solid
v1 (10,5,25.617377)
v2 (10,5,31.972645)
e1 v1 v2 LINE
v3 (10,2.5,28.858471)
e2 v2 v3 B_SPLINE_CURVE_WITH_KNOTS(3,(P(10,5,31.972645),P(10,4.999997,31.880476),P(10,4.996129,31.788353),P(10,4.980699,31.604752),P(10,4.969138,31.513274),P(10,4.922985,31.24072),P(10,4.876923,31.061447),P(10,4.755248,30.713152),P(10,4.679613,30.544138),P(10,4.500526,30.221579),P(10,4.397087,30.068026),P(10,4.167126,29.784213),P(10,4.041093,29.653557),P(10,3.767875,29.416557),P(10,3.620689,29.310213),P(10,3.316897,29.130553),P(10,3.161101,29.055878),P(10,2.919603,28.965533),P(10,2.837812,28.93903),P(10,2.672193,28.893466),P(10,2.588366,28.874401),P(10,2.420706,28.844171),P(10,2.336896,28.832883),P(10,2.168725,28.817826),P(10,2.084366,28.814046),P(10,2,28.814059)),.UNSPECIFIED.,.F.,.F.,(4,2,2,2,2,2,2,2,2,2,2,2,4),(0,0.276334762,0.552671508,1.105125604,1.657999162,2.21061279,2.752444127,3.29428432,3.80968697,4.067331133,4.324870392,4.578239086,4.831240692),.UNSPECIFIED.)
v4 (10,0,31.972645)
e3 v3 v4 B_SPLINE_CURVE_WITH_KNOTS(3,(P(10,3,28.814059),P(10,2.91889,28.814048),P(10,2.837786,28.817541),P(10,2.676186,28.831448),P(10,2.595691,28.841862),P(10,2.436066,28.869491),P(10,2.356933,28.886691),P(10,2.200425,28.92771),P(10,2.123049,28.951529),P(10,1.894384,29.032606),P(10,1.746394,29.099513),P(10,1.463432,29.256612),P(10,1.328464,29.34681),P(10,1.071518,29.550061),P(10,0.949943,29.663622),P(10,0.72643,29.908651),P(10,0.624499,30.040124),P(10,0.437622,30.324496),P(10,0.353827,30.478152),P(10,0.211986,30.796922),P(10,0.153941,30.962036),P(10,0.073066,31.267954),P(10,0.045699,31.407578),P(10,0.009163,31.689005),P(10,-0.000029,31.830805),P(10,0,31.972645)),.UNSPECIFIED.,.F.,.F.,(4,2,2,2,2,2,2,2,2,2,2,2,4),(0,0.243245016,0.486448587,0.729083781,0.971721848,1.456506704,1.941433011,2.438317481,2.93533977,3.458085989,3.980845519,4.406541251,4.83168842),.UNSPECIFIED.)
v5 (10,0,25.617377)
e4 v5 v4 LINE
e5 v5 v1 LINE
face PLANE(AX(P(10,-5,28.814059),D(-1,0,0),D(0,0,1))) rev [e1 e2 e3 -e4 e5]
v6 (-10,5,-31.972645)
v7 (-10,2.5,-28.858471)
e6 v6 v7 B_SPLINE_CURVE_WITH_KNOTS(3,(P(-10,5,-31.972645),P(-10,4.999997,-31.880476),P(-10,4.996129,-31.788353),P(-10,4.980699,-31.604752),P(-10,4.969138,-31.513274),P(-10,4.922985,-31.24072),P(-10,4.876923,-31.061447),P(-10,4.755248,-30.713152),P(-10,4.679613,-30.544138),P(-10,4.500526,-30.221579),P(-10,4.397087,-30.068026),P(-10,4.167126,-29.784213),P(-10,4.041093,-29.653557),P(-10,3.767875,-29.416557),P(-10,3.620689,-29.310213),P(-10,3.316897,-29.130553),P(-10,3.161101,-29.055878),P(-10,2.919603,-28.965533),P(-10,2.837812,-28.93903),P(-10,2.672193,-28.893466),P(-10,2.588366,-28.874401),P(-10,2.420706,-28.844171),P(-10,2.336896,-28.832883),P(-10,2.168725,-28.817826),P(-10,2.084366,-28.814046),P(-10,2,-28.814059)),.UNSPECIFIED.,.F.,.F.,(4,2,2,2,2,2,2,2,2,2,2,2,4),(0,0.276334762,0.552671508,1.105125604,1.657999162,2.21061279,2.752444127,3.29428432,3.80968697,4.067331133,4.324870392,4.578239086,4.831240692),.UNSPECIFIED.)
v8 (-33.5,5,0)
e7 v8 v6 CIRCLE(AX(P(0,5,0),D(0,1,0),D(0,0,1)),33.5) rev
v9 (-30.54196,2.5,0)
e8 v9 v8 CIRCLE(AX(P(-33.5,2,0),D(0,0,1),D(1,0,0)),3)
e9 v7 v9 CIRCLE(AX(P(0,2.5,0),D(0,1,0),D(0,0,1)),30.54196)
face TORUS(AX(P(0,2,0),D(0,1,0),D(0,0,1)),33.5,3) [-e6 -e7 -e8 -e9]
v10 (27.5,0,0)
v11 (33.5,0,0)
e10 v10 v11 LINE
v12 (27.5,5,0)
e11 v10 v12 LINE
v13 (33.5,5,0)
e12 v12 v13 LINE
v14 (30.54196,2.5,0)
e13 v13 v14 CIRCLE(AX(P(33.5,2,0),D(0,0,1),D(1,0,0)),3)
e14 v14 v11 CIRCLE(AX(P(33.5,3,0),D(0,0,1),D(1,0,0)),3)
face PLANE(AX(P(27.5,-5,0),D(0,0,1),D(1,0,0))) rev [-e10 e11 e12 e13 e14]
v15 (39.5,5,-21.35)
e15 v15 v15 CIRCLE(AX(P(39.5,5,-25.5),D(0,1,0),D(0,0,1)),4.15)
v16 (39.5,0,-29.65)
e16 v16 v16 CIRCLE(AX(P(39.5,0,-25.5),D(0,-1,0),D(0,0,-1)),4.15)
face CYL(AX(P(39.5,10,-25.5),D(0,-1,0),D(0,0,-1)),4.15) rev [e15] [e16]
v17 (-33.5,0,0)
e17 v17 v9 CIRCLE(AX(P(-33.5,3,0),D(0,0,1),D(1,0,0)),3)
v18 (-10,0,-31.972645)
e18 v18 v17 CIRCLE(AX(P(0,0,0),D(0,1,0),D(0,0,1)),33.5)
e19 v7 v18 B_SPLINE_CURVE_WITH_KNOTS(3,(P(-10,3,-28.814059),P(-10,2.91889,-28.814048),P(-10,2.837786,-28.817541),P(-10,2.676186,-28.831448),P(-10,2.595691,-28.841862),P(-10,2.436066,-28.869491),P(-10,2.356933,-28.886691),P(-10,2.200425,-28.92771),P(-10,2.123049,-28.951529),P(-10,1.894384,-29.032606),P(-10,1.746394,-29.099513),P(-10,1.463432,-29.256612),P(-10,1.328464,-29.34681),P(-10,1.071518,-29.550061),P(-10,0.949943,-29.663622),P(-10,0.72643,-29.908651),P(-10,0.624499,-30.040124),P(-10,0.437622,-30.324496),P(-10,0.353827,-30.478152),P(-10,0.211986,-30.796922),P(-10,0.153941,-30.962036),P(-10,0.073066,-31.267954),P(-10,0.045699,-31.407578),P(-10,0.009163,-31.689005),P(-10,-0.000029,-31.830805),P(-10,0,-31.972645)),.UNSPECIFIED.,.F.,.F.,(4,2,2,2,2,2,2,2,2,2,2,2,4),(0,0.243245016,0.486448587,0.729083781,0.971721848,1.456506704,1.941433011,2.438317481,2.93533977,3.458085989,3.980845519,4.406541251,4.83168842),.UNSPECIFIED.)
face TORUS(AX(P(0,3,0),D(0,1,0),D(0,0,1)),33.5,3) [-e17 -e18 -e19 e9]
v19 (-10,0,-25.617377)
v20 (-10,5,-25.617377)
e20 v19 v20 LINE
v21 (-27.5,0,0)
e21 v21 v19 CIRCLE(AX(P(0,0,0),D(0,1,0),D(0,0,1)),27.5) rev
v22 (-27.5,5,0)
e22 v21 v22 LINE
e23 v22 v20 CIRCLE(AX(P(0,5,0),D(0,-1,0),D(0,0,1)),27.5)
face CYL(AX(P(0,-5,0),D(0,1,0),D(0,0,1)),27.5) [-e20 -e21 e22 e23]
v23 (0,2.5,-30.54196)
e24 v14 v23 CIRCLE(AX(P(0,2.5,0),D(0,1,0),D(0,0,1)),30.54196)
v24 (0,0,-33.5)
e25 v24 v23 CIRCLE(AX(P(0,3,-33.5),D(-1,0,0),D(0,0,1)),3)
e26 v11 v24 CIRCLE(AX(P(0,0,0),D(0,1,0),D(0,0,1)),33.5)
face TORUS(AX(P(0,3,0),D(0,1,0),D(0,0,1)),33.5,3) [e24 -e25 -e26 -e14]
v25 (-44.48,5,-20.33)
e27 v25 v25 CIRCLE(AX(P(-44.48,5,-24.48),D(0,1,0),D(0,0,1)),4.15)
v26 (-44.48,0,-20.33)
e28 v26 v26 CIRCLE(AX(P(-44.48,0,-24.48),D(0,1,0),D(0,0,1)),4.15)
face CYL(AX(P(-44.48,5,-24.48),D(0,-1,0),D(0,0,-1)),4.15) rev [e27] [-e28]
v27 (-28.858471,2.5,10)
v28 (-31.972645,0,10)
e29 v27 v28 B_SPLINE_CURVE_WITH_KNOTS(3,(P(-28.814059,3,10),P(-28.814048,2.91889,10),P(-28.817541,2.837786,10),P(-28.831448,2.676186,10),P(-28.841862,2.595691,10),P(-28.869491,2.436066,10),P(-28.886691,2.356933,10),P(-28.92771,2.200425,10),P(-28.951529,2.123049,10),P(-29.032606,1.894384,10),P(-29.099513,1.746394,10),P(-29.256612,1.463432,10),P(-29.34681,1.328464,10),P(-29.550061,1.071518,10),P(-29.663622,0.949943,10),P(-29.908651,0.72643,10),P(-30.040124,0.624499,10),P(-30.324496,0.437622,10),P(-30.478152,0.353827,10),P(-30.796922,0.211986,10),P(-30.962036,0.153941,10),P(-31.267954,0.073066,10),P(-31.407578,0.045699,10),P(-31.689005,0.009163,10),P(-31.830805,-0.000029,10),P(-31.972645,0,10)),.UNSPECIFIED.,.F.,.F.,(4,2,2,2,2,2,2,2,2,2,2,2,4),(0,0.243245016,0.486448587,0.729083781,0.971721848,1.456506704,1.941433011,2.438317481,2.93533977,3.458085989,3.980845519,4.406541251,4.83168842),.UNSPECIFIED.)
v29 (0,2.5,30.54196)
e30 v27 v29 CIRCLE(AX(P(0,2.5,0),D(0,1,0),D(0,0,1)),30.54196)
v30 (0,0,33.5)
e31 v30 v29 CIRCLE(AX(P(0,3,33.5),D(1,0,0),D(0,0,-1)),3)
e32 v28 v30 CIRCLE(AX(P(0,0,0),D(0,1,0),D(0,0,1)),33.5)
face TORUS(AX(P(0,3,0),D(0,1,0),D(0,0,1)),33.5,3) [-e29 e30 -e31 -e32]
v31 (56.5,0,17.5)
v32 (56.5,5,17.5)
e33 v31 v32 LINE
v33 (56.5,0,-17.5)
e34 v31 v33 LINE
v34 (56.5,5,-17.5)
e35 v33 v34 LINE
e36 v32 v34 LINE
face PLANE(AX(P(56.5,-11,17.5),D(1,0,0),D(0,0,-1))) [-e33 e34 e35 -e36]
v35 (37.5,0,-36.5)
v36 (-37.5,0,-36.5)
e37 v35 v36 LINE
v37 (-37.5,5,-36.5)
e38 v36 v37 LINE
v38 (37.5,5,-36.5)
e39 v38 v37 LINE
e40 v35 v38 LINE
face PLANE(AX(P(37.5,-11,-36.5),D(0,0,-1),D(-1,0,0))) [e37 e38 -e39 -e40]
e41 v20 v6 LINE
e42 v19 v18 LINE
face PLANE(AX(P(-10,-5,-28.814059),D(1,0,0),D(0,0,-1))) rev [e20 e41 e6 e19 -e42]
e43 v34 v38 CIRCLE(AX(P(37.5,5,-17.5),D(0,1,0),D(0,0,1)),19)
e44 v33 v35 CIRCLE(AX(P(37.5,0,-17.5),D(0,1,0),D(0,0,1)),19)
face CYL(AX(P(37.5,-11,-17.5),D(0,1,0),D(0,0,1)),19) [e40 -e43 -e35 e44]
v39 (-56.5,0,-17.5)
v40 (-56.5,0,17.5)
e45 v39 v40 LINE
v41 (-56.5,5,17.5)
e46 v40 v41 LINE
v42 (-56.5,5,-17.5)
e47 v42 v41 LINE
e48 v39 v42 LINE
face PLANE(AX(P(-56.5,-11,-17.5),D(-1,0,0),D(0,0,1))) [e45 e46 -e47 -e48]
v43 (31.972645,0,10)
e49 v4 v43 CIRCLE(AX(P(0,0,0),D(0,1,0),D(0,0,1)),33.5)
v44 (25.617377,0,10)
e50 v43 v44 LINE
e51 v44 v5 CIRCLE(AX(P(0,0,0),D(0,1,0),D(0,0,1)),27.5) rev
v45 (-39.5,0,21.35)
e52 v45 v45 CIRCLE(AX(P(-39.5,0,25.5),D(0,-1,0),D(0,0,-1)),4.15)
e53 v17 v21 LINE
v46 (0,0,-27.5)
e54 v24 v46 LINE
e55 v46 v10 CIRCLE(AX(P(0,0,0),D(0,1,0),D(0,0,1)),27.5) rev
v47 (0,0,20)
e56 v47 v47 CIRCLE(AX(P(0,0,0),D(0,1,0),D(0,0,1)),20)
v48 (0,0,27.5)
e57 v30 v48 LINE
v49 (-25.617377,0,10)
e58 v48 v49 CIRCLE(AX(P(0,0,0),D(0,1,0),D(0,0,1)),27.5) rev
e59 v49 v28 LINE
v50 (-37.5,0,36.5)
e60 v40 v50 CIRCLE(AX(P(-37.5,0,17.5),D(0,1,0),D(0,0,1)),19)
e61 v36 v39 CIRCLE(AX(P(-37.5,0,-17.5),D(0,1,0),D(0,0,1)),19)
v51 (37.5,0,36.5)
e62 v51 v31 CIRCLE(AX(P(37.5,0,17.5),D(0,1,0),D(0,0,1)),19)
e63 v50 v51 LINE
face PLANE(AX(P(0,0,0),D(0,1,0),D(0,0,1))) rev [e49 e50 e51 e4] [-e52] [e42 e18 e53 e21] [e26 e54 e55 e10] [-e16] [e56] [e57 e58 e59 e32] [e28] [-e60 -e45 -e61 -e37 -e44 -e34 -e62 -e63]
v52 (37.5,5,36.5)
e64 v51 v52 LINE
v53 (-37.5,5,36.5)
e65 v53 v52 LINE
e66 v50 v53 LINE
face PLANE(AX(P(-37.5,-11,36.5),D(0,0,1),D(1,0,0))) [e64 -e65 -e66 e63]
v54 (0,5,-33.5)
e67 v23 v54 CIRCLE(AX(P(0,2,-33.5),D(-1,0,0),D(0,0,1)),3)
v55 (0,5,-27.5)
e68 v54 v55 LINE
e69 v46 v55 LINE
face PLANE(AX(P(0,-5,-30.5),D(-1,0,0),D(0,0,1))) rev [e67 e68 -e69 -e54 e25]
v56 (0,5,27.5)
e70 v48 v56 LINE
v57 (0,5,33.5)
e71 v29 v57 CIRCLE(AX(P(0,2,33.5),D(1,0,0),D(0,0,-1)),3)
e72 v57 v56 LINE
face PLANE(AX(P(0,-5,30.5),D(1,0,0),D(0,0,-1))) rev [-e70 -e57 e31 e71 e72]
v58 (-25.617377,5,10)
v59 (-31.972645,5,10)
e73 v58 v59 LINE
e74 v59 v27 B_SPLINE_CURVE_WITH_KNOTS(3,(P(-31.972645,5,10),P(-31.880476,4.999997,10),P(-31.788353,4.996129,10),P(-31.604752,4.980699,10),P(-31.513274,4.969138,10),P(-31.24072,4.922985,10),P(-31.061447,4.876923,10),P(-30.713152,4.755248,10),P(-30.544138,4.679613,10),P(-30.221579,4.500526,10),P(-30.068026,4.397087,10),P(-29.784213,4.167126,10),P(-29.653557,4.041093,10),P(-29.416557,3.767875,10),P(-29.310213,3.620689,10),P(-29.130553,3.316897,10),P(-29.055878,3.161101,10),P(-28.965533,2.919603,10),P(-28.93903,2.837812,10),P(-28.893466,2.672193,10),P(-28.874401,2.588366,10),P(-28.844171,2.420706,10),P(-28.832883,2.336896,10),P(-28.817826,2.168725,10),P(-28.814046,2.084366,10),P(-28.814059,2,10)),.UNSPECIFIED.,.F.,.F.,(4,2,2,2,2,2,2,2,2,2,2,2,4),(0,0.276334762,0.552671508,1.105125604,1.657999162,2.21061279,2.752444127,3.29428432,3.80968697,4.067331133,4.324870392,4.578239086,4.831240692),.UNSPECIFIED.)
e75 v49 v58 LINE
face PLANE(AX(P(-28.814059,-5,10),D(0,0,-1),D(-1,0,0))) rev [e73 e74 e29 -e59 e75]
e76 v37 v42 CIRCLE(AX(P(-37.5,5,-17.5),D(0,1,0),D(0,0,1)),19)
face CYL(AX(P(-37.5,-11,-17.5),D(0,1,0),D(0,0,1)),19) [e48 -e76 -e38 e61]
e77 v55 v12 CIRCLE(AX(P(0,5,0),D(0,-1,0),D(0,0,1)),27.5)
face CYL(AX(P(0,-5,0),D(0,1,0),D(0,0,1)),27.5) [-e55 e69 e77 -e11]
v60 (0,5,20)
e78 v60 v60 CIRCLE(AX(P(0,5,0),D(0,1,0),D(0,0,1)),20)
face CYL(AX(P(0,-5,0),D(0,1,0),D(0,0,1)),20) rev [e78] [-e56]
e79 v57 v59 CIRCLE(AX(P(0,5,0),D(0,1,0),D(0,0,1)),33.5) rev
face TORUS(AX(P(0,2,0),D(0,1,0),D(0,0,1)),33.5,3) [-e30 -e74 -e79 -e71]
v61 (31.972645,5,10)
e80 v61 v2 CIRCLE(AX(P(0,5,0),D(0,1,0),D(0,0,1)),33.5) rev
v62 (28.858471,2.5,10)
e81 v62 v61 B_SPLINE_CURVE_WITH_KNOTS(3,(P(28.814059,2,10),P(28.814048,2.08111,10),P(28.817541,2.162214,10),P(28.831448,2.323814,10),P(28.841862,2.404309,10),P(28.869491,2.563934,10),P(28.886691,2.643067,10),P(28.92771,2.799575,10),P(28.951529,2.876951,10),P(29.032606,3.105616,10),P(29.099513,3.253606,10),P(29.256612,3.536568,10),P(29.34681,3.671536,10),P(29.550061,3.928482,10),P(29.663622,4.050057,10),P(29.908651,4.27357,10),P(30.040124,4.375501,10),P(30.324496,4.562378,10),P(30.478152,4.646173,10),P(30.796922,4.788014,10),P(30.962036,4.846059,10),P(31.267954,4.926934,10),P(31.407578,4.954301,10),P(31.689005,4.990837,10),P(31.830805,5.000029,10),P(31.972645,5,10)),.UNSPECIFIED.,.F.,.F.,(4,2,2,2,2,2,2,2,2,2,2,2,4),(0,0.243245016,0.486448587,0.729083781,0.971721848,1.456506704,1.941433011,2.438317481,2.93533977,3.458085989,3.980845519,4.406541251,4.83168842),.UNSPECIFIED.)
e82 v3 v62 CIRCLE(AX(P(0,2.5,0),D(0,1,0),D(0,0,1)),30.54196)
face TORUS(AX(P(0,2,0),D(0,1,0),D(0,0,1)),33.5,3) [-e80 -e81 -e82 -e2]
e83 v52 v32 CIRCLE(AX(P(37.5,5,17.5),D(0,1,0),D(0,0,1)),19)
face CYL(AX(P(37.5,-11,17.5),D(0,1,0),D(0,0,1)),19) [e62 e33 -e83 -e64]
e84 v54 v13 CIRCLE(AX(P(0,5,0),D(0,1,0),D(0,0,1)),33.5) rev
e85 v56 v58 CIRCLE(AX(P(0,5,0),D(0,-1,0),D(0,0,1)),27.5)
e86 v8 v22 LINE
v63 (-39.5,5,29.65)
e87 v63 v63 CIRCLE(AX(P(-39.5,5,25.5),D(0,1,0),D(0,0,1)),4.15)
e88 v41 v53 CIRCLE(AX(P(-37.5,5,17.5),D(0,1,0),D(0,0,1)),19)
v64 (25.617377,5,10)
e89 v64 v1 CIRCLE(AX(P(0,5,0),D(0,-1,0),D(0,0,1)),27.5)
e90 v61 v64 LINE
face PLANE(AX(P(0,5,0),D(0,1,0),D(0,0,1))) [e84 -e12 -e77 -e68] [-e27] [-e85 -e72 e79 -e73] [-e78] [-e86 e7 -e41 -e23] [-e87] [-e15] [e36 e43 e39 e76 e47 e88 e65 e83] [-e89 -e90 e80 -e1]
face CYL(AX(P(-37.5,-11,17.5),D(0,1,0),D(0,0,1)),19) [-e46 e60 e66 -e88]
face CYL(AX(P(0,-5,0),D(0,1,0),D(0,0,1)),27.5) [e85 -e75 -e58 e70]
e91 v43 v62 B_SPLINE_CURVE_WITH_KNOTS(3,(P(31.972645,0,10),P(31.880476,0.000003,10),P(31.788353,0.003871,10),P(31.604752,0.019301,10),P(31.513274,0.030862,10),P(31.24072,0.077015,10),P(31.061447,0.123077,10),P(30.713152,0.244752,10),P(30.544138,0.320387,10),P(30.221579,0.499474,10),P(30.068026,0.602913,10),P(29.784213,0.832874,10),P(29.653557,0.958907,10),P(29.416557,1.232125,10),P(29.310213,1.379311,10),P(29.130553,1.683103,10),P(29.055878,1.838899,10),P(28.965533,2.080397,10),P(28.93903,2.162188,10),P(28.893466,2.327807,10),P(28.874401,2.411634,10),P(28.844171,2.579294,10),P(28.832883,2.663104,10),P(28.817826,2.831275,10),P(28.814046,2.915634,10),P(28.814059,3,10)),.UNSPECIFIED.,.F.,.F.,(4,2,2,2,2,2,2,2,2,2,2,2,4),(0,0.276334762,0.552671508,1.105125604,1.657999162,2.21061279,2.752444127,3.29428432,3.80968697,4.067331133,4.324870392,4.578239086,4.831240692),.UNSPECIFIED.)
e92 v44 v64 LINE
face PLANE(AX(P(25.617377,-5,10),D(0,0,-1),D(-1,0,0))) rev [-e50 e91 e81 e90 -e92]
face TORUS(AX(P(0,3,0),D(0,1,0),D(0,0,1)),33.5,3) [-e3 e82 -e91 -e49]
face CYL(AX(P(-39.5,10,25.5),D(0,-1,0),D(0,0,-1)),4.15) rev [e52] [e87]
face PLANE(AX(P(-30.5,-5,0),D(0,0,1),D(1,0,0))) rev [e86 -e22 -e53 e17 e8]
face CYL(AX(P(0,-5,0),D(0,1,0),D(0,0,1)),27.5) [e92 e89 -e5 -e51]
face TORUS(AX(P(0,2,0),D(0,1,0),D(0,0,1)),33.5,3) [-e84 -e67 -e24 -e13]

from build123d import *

# Parameters (mm, degrees)
SKETCH1_W           = 115
SKETCH1_H           = 75
SKETCH1_R           = 4.15
BOSS_EXTRUDE1_DEPTH = 5
FILLET1_R           = 20
SKETCH5_R           = 4.15
CUT_EXTRUDE4_DEPTH  = 10
CUT_EXTRUDE7_DEPTH  = 16
SKETCH12_R          = 20
CUT_EXTRUDE8_DEPTH  = 10
FILLET2_R           = 3


with BuildPart() as part:
    # Sketch1 → Boss-Extrude1 (new body)
    with BuildSketch(Plane(origin=(0, 0, 0), x_dir=(1, 0, 0), z_dir=(0, 1, 0))):
        Rectangle(SKETCH1_W, SKETCH1_H)
        with Locations(Location((-44.48, 24.48, 0), (0, 0, 270))):
            Circle(SKETCH1_R, mode=Mode.SUBTRACT)
    extrude(amount=BOSS_EXTRUDE1_DEPTH)

    # Fillet1
    fillet1_edges = [part.edges().sort_by_distance(p)[0] for p in [
        (57.5, 2.5, 37.5),
        (-57.5, 2.5, 37.5),
        (-57.5, 2.5, -37.5),
        (57.5, 2.5, -37.5),
    ]]
    fillet(fillet1_edges, radius=FILLET1_R)

    # Sketch5 → Cut-Extrude4 (cut)
    with BuildSketch(Plane.XZ):
        with Locations(Location((-39.5, 25.5, 0), (0, 0, 270))):
            Circle(SKETCH5_R)
        with Locations(Location((39.5, -25.5, 0), (0, 0, 270))):
            Circle(SKETCH5_R)
    extrude(amount=-CUT_EXTRUDE4_DEPTH, mode=Mode.SUBTRACT)

    # Sketch11 → Cut-Extrude7 (cut)
    with BuildSketch(Plane(origin=(0, 5, 0), x_dir=(1, 0, 0), z_dir=(0, 1, 0))):
        with BuildLine():
            Line((57.5, -17.5), (57.5, 17.5))
            ThreePointArc((57.5, 17.5), (51.642135624, 31.642135624), (37.5, 37.5))
            Line((37.5, 37.5), (-37.5, 37.5))
            ThreePointArc((-37.5, 37.5), (-51.642135624, 31.642135624), (-57.5, 17.5))
            Line((-57.5, 17.5), (-57.5, -17.5))
            ThreePointArc((-57.5, -17.5), (-51.642135624, -31.642135624), (-37.5, -37.5))
            Line((-37.5, -37.5), (37.5, -37.5))
            ThreePointArc((37.5, -37.5), (51.642135624, -31.642135624), (57.5, -17.5))
        make_face()
        with BuildLine():
            Line((37.5, 36.5), (-37.5, 36.5))
            ThreePointArc((-37.5, 36.5), (-50.935028843, 30.935028843), (-56.5, 17.5))
            Line((-56.5, 17.5), (-56.5, -17.5))
            ThreePointArc((-56.5, -17.5), (-50.935028843, -30.935028843), (-37.5, -36.5))
            Line((-37.5, -36.5), (37.5, -36.5))
            ThreePointArc((37.5, -36.5), (50.935028843, -30.935028843), (56.5, -17.5))
            Line((56.5, -17.5), (56.5, 17.5))
            ThreePointArc((56.5, 17.5), (50.935028843, 30.935028843), (37.5, 36.5))
        make_face(mode=Mode.SUBTRACT)
    extrude(amount=-CUT_EXTRUDE7_DEPTH, mode=Mode.SUBTRACT)

    # Sketch12 → Cut-Extrude8 (cut)
    with BuildSketch(Plane(origin=(0, 5, 0), x_dir=(1, 0, 0), z_dir=(0, 1, 0))):
        with Locations(Location((0, 0, 0), (0, 0, 270))):
            Circle(SKETCH12_R)
        with BuildLine():
            Line((0, 30.5), (0, 27.5))
            ThreePointArc((0, 27.5), (19.445436483, 19.445436483), (27.5, 0))
            Line((27.5, 0), (30.5, 0))
            ThreePointArc((30.5, 0), (21.566756826, 21.566756826), (0, 30.5))
        make_face()
        with BuildLine():
            Line((-30.5, 0), (-27.5, 0))
            ThreePointArc((-27.5, 0), (-22.707377656, 15.512092057), (-10, 25.617376915))
            Line((-10, 25.617376915), (-10, 28.814059068))
            ThreePointArc((-10, 28.814059068), (-24.852062289, 17.68120471), (-30.5, 0))
        make_face()
        with BuildLine():
            Line((0, -30.5), (0, -27.5))
            ThreePointArc((0, -27.5), (-15.512092057, -22.707377656), (-25.617376915, -10))
            Line((-25.617376915, -10), (-28.814059068, -10))
            ThreePointArc((-28.814059068, -10), (-17.68120471, -24.852062289), (0, -30.5))
        make_face()
        with BuildLine():
            Line((25.617376915, -10), (28.814059068, -10))
            ThreePointArc((28.814059068, -10), (21.566756826, -21.566756826), (10, -28.814059068))
            Line((10, -28.814059068), (10, -25.617376915))
            ThreePointArc((10, -25.617376915), (19.445436483, -19.445436483), (25.617376915, -10))
        make_face()
    extrude(amount=-CUT_EXTRUDE8_DEPTH, mode=Mode.SUBTRACT)

    # Fillet2
    # the kernel refuses this fillet: 3 mm, written as the material it takes off along each edge
    with BuildSketch(Plane(origin=(0, 0, 0), x_dir=(-0.9961231139534353, 0, 0.08797011906159574), z_dir=(-0.08797011906159574, 0, -0.9961231139534353))) as fillet2_piece_1_section:
        with BuildLine():
            CenterArc((30.5 + FILLET2_R, FILLET2_R), FILLET2_R, 180, 90)
            Line((30.5, FILLET2_R), (30.5, 0))
            Line((30.5, 0), (30.5 + FILLET2_R, 0))
        make_face()
    fillet2_piece_1 = revolve(axis=Axis((0, 0, 0), (0, 1, 0)), revolution_arc=84.953159759, mode=Mode.PRIVATE)
    fillet2_piece_1 = split(fillet2_piece_1, bisect_by=Plane(origin=(-18.564957711, 0.847104703, 10), z_dir=(0, 0, 1)), keep=Keep.TOP, mode=Mode.PRIVATE)
    add(fillet2_piece_1, mode=Mode.SUBTRACT)
    with BuildSketch(Plane(origin=(0, 0, 0), x_dir=(-0.08797011906159563, 0, -0.9961231139534353), z_dir=(0.9961231139534353, 0, -0.08797011906159563))) as fillet2_piece_2_section:
        with BuildLine():
            CenterArc((30.5 + FILLET2_R, FILLET2_R), FILLET2_R, 180, 90)
            Line((30.5, FILLET2_R), (30.5, 0))
            Line((30.5, 0), (30.5 + FILLET2_R, 0))
        make_face()
    fillet2_piece_2 = revolve(axis=Axis((0, 0, 0), (0, 1, 0)), revolution_arc=84.953159759, mode=Mode.PRIVATE)
    fillet2_piece_2 = split(fillet2_piece_2, bisect_by=Plane(origin=(-10, 0.847104703, -18.564957711), z_dir=(-1, 0, 0)), keep=Keep.TOP, mode=Mode.PRIVATE)
    add(fillet2_piece_2, mode=Mode.SUBTRACT)
    with BuildSketch(Plane(origin=(0, 0, 0), x_dir=(1, 0, 0), z_dir=(0, 0, 1))) as fillet2_piece_3:
        with BuildLine():
            CenterArc((30.5 + FILLET2_R, FILLET2_R), FILLET2_R, 180, 90)
            Line((30.5, FILLET2_R), (30.5, 0))
            Line((30.5, 0), (30.5 + FILLET2_R, 0))
        make_face()
    revolve(axis=Axis((0, 0, 0), (0, 1, 0)), revolution_arc=90, mode=Mode.SUBTRACT)
    with BuildSketch(Plane(origin=(0, 0, 0), x_dir=(0.08799861930970912, 0, 0.9961205966144786), z_dir=(-0.9961205966144786, 0, 0.08799861930970912))) as fillet2_piece_4_section:
        with BuildLine():
            CenterArc((30.5 + FILLET2_R, FILLET2_R), FILLET2_R, 180, 90)
            Line((30.5, FILLET2_R), (30.5, 0))
            Line((30.5, 0), (30.5 + FILLET2_R, 0))
        make_face()
    fillet2_piece_4 = revolve(axis=Axis((0, 0, 0), (0, 1, 0)), revolution_arc=79.903040915, mode=Mode.PRIVATE)
    fillet2_piece_4 = split(fillet2_piece_4, bisect_by=Plane(origin=(10, 0.85015092, 22.167904307), z_dir=(1, 0, 0)), keep=Keep.TOP, mode=Mode.PRIVATE)
    fillet2_piece_4 = split(fillet2_piece_4, bisect_by=Plane(origin=(22.167904307, 0.85015092, 10), z_dir=(0, 0, 1)), keep=Keep.TOP, mode=Mode.PRIVATE)
    add(fillet2_piece_4, mode=Mode.SUBTRACT)
    with BuildSketch(Plane(origin=(0, 5, 0), x_dir=(-0.9961231139534353, 0, 0.08797011906159574), z_dir=(-0.08797011906159574, 0, -0.9961231139534353))) as fillet2_piece_5_section:
        with BuildLine():
            CenterArc((30.5 + FILLET2_R, -FILLET2_R), FILLET2_R, 90, 90)
            Line((30.5 + FILLET2_R, 0), (30.5, 0))
            Line((30.5, 0), (30.5, -FILLET2_R))
        make_face()
    fillet2_piece_5 = revolve(axis=Axis((0, 5, 0), (0, 1, 0)), revolution_arc=84.953159759, mode=Mode.PRIVATE)
    fillet2_piece_5 = split(fillet2_piece_5, bisect_by=Plane(origin=(-18.564957711, 4.152895297, 10), z_dir=(0, 0, 1)), keep=Keep.TOP, mode=Mode.PRIVATE)
    add(fillet2_piece_5, mode=Mode.SUBTRACT)
    with BuildSketch(Plane(origin=(0, 5, 0), x_dir=(-0.08797011906159553, 0, -0.9961231139534353), z_dir=(0.9961231139534353, 0, -0.08797011906159553))) as fillet2_piece_6_section:
        with BuildLine():
            CenterArc((30.5 + FILLET2_R, -FILLET2_R), FILLET2_R, 90, 90)
            Line((30.5 + FILLET2_R, 0), (30.5, 0))
            Line((30.5, 0), (30.5, -FILLET2_R))
        make_face()
    fillet2_piece_6 = revolve(axis=Axis((0, 5, 0), (0, 1, 0)), revolution_arc=84.953159759, mode=Mode.PRIVATE)
    fillet2_piece_6 = split(fillet2_piece_6, bisect_by=Plane(origin=(-10, 4.152895297, -18.564957711), z_dir=(-1, 0, 0)), keep=Keep.TOP, mode=Mode.PRIVATE)
    add(fillet2_piece_6, mode=Mode.SUBTRACT)
    with BuildSketch(Plane(origin=(0, 5, 0), x_dir=(0.9961205966144787, 0, 0.08799861930970913), z_dir=(0.08799861930970913, 0, -0.9961205966144787))) as fillet2_piece_7_section:
        with BuildLine():
            CenterArc((30.5 + FILLET2_R, FILLET2_R), FILLET2_R, 180, 90)
            Line((30.5 + FILLET2_R, 0), (30.5, 0))
            Line((30.5, 0), (30.5, FILLET2_R))
        make_face()
    fillet2_piece_7 = revolve(axis=Axis((0, 5, 0), (0, -1, 0)), revolution_arc=79.903040915, mode=Mode.PRIVATE)
    fillet2_piece_7 = split(fillet2_piece_7, bisect_by=Plane(origin=(10, 4.149849079, 22.167904307), z_dir=(1, 0, 0)), keep=Keep.TOP, mode=Mode.PRIVATE)
    fillet2_piece_7 = split(fillet2_piece_7, bisect_by=Plane(origin=(22.167904307, 4.149849079, 10), z_dir=(0, 0, 1)), keep=Keep.TOP, mode=Mode.PRIVATE)
    add(fillet2_piece_7, mode=Mode.SUBTRACT)
    with BuildSketch(Plane(origin=(0, 5, 0), x_dir=(1, 0, 0), z_dir=(0, 0, 1))) as fillet2_piece_8:
        with BuildLine():
            CenterArc((30.5 + FILLET2_R, -FILLET2_R), FILLET2_R, 90, 90)
            Line((30.5 + FILLET2_R, 0), (30.5, 0))
            Line((30.5, 0), (30.5, -FILLET2_R))
        make_face()
    revolve(axis=Axis((0, 5, 0), (0, 1, 0)), revolution_arc=90, mode=Mode.SUBTRACT)


solid = part.part
